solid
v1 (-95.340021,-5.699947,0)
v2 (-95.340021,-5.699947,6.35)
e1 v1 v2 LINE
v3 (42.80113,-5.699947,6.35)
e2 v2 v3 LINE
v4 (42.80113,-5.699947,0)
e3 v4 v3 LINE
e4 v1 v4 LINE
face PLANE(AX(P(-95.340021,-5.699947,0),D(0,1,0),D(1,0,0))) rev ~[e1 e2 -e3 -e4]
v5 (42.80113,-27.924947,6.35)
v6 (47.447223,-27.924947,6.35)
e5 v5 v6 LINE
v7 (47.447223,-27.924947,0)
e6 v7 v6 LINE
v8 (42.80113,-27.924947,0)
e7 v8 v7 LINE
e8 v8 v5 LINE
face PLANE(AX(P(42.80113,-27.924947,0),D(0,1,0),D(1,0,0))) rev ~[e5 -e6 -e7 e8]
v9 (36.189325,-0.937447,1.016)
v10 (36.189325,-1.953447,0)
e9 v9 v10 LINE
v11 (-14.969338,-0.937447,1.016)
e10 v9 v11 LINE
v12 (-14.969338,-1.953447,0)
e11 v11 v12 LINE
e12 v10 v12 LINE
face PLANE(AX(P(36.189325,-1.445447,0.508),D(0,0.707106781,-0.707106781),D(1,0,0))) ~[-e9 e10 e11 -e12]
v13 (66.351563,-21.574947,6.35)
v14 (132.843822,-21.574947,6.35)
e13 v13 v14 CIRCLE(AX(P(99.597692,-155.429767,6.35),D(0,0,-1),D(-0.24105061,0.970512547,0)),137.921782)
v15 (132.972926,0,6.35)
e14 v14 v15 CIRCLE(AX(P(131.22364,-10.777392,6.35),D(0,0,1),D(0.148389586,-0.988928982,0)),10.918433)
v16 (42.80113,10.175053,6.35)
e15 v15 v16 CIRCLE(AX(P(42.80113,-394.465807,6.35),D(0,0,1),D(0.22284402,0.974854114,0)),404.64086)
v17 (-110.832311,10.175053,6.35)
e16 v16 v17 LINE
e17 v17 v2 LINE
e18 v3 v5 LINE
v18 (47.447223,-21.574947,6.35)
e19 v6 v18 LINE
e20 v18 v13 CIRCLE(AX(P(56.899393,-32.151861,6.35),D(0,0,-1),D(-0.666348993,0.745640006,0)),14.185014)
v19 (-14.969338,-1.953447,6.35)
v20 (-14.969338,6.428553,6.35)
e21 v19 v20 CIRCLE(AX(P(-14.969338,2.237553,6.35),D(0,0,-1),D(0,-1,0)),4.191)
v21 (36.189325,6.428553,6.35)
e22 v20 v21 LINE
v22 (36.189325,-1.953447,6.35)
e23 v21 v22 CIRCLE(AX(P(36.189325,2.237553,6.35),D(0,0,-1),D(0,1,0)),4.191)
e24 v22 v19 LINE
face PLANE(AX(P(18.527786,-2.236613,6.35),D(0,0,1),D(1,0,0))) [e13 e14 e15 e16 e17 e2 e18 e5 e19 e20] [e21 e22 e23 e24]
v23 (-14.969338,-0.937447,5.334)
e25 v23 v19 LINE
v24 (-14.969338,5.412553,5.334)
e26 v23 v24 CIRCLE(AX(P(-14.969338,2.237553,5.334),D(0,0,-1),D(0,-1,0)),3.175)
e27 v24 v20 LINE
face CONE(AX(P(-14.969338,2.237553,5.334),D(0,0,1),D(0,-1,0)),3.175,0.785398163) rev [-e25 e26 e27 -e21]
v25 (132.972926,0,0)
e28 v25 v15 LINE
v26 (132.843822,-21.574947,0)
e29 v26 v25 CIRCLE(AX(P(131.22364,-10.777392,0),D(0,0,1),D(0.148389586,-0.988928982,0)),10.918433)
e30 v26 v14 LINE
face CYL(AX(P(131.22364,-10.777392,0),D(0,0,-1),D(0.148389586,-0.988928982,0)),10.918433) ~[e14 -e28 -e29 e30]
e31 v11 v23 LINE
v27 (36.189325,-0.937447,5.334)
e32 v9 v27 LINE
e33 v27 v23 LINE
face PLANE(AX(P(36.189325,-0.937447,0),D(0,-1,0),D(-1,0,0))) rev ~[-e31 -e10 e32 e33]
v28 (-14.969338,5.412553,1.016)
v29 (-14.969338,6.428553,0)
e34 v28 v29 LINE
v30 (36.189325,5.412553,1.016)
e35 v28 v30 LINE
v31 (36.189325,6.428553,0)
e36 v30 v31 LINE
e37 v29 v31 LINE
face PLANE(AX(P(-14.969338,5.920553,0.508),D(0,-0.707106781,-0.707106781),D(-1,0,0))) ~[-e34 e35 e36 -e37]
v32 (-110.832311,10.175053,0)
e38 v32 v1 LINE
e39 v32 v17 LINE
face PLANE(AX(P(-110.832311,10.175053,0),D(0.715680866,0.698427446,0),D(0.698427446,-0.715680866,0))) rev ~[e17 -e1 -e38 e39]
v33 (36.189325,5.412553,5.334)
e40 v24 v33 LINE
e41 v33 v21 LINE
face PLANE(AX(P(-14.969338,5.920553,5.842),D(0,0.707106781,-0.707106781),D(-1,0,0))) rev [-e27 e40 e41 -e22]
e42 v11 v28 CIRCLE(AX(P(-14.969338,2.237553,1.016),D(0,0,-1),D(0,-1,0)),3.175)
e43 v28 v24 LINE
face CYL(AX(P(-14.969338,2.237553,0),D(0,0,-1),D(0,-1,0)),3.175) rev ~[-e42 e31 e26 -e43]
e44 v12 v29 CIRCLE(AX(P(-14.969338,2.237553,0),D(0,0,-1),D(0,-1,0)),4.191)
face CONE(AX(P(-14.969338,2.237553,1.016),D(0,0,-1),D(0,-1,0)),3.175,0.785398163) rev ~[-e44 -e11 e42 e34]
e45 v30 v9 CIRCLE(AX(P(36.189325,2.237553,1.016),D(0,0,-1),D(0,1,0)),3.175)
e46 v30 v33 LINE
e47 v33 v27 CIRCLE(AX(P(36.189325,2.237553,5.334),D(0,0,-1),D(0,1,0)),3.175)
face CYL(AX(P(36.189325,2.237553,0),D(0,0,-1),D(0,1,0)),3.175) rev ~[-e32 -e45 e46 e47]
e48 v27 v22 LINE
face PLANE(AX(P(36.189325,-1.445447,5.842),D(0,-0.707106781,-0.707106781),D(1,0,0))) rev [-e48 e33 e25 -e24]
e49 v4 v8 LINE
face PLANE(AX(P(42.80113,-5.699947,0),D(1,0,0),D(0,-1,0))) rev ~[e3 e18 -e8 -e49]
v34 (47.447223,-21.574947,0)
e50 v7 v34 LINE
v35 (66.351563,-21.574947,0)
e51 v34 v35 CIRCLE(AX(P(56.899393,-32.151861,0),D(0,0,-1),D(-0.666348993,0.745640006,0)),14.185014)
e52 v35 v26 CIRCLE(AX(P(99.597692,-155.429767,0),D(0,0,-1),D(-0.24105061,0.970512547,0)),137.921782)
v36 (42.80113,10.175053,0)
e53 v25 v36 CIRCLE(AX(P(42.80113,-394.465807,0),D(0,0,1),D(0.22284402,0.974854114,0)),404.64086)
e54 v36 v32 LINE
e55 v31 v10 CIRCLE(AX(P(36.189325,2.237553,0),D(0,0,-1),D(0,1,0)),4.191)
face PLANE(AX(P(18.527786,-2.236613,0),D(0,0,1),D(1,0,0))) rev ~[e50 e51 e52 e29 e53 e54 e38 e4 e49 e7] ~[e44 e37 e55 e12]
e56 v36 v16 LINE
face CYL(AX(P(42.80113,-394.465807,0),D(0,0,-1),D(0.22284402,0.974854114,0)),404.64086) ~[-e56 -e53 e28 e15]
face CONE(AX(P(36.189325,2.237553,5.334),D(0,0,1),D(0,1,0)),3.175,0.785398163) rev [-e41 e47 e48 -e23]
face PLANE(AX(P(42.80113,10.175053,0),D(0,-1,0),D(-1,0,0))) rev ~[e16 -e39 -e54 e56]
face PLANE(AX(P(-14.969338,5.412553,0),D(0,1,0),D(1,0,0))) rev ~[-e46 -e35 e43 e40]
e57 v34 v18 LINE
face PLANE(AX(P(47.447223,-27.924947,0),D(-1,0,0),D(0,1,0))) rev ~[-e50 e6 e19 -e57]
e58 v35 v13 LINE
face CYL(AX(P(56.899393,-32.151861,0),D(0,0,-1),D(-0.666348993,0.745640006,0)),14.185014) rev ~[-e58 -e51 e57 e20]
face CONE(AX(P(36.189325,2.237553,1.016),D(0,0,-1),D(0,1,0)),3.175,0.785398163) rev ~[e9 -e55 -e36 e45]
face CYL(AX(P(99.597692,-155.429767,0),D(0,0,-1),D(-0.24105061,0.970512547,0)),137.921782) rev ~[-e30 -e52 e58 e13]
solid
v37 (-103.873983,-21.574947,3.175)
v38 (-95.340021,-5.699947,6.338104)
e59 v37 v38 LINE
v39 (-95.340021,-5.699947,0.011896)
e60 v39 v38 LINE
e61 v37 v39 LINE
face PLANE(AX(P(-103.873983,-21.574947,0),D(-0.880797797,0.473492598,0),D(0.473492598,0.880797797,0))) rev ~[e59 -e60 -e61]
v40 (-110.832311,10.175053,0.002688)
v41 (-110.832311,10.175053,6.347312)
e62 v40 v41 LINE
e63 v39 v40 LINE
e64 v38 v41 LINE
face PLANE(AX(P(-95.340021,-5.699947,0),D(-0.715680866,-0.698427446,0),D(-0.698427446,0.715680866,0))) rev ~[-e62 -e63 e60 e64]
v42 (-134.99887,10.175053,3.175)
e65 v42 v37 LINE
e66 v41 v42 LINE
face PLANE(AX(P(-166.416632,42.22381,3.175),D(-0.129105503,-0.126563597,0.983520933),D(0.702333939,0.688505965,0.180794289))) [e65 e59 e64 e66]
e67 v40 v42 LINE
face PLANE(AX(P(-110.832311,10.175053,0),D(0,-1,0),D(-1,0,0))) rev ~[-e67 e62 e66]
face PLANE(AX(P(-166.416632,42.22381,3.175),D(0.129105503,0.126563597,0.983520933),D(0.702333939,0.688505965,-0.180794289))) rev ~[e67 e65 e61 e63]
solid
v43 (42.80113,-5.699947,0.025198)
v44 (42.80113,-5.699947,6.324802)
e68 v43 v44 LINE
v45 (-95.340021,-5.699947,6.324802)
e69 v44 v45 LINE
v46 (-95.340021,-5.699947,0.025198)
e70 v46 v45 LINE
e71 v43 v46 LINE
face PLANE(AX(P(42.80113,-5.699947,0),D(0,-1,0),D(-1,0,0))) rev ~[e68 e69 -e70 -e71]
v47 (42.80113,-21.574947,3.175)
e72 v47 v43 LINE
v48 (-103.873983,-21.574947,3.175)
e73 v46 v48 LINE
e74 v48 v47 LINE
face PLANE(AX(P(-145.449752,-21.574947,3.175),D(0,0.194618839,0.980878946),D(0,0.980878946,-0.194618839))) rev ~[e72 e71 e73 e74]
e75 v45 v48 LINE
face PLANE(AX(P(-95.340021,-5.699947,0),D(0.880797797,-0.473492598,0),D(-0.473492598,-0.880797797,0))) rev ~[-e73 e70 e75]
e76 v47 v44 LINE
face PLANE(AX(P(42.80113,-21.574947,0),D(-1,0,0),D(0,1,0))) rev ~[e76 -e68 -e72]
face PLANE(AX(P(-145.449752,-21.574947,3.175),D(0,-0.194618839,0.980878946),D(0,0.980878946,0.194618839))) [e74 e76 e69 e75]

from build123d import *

# Parameters (mm, degrees)
F1_DEPTH    = 6.35
F2_DEPTH    = 6.35
F3_DEPTH    = 6.35
F4_T1_DEPTH = 229.8266509334
F5_T1_DEPTH = 134.2211036102
F6_SIZE     = 1.016


# Not quite as in the source:
# - a fillet or chamfer that OpenCascade refuses, or shapes differently, is made with other operations: its cross-section is extruded or revolved along the edge and cut away or added


with BuildPart() as f1:
    # F0 (on Top) → F1 (new body)
    with BuildSketch(Plane.XY):
        with BuildLine():
            Line((42.8011300921, 10.175053092), (-110.832311213, 10.175053092))
            Line((-110.832311213, 10.175053092), (-95.3400209546, -5.699946908))
            Line((-95.3400209546, -5.699946908), (42.8011300921, -5.699946908))
            Line((42.8011300921, -5.699946908), (42.8011300921, -21.574946908))
            Line((42.8011300921, -21.574946908), (42.8011300921, -27.924946908))
            Line((42.8011300921, -27.924946908), (47.4472232163, -27.924946908))
            Line((47.4472232163, -27.924946908), (47.4472232163, -21.574946908))
            ThreePointArc((47.4472232163, -21.574946908), (56.8993929774, -17.9668468512), (66.3515627384, -21.574946908))
            ThreePointArc((66.3515627384, -21.574946908), (99.5976924896, -17.5079847975), (132.8438222408, -21.574946908))
            ThreePointArc((132.8438222408, -21.574946908), (142.1418780211, -10.84272639), (132.9729259014, 0))
            ThreePointArc((132.9729259014, 0), (88.1731602013, 7.6232435083), (42.8011300921, 10.175053092))
        make_face()
        with BuildLine():
            Line((-14.9693377316, 5.412553092), (36.1893251538, 5.412553092))
            ThreePointArc((36.1893251538, 5.412553092), (39.3643251538, 2.237553092), (36.1893251538, -0.937446908))
            Line((36.1893251538, -0.937446908), (-14.9693377316, -0.937446908))
            ThreePointArc((-14.9693377316, -0.937446908), (-18.1443377316, 2.237553092), (-14.9693377316, 5.412553092))
        make_face(mode=Mode.SUBTRACT)
    extrude(amount=F1_DEPTH)

    # F6
    f6_edges = [f1.edges().sort_by_distance(p)[0] for p in [
        (10.609994, 5.412553, 6.35),
        (-18.144338, 2.237553, 6.35),
        (10.609994, -0.937447, 6.35),
        (39.364325, 2.237553, 6.35),
        (10.609994, -0.937447, 0),
        (-18.144338, 2.237553, 0),
        (39.364325, 2.237553, 0),
        (10.609994, 5.412553, 0),
    ]]
    chamfer(f6_edges, length=F6_SIZE)


with BuildPart() as f2:
    # F0 (on Top) → F2 (new body)
    with BuildSketch(Plane.XY):
        Polygon((-95.3400209546, -5.699946908), (-103.8739830256, -21.574946908), (42.8011300921, -21.574946908), (42.8011300921, -5.699946908), align=None)
    extrude(amount=F2_DEPTH)

    # F4: chamfer of 16.002 x 3.175 on 2 edges, made by hand

    # F4_s2 → F4_t1 (cut)
    with BuildSketch(Plane.YZ.offset(-145.4497519334)):
        Polygon((-21.574946908, 3.175), (-5.572946908, 6.35), (-21.574946908, 6.35), align=None)
        Polygon((-21.574946908, 3.175), (-5.572946908, 0), (-21.574946908, 0), align=None)
    extrude(amount=F4_T1_DEPTH, mode=Mode.SUBTRACT)


with BuildPart() as f3:
    # F0 (on Top) → F3 (new body)
    with BuildSketch(Plane.XY):
        Polygon((-110.832311213, 10.175053092), (-134.9988699079, 10.175053092), (-103.8739830256, -21.574946908), (-95.3400209546, -5.699946908), align=None)
    extrude(amount=F3_DEPTH)

    # F5: chamfer of 17.272 x 3.175 on 2 edges, made by hand

    # F5_s2 → F5_t1 (cut)
    with BuildSketch(Plane(origin=(-102.6616678748, 104.7235277465, 0), x_dir=(0, 0, 1), z_dir=(0.7000420043, -0.714101668, 0))):
        Polygon((3.175, 89.2799536123), (6.35, 72.0079536123), (6.35, 89.2799536123), align=None)
        Polygon((3.175, 89.2799536123), (0, 72.0079536123), (0, 89.2799536123), align=None)
    extrude(amount=F5_T1_DEPTH, mode=Mode.SUBTRACT)


solid = Compound([f1.part, f2.part, f3.part])
